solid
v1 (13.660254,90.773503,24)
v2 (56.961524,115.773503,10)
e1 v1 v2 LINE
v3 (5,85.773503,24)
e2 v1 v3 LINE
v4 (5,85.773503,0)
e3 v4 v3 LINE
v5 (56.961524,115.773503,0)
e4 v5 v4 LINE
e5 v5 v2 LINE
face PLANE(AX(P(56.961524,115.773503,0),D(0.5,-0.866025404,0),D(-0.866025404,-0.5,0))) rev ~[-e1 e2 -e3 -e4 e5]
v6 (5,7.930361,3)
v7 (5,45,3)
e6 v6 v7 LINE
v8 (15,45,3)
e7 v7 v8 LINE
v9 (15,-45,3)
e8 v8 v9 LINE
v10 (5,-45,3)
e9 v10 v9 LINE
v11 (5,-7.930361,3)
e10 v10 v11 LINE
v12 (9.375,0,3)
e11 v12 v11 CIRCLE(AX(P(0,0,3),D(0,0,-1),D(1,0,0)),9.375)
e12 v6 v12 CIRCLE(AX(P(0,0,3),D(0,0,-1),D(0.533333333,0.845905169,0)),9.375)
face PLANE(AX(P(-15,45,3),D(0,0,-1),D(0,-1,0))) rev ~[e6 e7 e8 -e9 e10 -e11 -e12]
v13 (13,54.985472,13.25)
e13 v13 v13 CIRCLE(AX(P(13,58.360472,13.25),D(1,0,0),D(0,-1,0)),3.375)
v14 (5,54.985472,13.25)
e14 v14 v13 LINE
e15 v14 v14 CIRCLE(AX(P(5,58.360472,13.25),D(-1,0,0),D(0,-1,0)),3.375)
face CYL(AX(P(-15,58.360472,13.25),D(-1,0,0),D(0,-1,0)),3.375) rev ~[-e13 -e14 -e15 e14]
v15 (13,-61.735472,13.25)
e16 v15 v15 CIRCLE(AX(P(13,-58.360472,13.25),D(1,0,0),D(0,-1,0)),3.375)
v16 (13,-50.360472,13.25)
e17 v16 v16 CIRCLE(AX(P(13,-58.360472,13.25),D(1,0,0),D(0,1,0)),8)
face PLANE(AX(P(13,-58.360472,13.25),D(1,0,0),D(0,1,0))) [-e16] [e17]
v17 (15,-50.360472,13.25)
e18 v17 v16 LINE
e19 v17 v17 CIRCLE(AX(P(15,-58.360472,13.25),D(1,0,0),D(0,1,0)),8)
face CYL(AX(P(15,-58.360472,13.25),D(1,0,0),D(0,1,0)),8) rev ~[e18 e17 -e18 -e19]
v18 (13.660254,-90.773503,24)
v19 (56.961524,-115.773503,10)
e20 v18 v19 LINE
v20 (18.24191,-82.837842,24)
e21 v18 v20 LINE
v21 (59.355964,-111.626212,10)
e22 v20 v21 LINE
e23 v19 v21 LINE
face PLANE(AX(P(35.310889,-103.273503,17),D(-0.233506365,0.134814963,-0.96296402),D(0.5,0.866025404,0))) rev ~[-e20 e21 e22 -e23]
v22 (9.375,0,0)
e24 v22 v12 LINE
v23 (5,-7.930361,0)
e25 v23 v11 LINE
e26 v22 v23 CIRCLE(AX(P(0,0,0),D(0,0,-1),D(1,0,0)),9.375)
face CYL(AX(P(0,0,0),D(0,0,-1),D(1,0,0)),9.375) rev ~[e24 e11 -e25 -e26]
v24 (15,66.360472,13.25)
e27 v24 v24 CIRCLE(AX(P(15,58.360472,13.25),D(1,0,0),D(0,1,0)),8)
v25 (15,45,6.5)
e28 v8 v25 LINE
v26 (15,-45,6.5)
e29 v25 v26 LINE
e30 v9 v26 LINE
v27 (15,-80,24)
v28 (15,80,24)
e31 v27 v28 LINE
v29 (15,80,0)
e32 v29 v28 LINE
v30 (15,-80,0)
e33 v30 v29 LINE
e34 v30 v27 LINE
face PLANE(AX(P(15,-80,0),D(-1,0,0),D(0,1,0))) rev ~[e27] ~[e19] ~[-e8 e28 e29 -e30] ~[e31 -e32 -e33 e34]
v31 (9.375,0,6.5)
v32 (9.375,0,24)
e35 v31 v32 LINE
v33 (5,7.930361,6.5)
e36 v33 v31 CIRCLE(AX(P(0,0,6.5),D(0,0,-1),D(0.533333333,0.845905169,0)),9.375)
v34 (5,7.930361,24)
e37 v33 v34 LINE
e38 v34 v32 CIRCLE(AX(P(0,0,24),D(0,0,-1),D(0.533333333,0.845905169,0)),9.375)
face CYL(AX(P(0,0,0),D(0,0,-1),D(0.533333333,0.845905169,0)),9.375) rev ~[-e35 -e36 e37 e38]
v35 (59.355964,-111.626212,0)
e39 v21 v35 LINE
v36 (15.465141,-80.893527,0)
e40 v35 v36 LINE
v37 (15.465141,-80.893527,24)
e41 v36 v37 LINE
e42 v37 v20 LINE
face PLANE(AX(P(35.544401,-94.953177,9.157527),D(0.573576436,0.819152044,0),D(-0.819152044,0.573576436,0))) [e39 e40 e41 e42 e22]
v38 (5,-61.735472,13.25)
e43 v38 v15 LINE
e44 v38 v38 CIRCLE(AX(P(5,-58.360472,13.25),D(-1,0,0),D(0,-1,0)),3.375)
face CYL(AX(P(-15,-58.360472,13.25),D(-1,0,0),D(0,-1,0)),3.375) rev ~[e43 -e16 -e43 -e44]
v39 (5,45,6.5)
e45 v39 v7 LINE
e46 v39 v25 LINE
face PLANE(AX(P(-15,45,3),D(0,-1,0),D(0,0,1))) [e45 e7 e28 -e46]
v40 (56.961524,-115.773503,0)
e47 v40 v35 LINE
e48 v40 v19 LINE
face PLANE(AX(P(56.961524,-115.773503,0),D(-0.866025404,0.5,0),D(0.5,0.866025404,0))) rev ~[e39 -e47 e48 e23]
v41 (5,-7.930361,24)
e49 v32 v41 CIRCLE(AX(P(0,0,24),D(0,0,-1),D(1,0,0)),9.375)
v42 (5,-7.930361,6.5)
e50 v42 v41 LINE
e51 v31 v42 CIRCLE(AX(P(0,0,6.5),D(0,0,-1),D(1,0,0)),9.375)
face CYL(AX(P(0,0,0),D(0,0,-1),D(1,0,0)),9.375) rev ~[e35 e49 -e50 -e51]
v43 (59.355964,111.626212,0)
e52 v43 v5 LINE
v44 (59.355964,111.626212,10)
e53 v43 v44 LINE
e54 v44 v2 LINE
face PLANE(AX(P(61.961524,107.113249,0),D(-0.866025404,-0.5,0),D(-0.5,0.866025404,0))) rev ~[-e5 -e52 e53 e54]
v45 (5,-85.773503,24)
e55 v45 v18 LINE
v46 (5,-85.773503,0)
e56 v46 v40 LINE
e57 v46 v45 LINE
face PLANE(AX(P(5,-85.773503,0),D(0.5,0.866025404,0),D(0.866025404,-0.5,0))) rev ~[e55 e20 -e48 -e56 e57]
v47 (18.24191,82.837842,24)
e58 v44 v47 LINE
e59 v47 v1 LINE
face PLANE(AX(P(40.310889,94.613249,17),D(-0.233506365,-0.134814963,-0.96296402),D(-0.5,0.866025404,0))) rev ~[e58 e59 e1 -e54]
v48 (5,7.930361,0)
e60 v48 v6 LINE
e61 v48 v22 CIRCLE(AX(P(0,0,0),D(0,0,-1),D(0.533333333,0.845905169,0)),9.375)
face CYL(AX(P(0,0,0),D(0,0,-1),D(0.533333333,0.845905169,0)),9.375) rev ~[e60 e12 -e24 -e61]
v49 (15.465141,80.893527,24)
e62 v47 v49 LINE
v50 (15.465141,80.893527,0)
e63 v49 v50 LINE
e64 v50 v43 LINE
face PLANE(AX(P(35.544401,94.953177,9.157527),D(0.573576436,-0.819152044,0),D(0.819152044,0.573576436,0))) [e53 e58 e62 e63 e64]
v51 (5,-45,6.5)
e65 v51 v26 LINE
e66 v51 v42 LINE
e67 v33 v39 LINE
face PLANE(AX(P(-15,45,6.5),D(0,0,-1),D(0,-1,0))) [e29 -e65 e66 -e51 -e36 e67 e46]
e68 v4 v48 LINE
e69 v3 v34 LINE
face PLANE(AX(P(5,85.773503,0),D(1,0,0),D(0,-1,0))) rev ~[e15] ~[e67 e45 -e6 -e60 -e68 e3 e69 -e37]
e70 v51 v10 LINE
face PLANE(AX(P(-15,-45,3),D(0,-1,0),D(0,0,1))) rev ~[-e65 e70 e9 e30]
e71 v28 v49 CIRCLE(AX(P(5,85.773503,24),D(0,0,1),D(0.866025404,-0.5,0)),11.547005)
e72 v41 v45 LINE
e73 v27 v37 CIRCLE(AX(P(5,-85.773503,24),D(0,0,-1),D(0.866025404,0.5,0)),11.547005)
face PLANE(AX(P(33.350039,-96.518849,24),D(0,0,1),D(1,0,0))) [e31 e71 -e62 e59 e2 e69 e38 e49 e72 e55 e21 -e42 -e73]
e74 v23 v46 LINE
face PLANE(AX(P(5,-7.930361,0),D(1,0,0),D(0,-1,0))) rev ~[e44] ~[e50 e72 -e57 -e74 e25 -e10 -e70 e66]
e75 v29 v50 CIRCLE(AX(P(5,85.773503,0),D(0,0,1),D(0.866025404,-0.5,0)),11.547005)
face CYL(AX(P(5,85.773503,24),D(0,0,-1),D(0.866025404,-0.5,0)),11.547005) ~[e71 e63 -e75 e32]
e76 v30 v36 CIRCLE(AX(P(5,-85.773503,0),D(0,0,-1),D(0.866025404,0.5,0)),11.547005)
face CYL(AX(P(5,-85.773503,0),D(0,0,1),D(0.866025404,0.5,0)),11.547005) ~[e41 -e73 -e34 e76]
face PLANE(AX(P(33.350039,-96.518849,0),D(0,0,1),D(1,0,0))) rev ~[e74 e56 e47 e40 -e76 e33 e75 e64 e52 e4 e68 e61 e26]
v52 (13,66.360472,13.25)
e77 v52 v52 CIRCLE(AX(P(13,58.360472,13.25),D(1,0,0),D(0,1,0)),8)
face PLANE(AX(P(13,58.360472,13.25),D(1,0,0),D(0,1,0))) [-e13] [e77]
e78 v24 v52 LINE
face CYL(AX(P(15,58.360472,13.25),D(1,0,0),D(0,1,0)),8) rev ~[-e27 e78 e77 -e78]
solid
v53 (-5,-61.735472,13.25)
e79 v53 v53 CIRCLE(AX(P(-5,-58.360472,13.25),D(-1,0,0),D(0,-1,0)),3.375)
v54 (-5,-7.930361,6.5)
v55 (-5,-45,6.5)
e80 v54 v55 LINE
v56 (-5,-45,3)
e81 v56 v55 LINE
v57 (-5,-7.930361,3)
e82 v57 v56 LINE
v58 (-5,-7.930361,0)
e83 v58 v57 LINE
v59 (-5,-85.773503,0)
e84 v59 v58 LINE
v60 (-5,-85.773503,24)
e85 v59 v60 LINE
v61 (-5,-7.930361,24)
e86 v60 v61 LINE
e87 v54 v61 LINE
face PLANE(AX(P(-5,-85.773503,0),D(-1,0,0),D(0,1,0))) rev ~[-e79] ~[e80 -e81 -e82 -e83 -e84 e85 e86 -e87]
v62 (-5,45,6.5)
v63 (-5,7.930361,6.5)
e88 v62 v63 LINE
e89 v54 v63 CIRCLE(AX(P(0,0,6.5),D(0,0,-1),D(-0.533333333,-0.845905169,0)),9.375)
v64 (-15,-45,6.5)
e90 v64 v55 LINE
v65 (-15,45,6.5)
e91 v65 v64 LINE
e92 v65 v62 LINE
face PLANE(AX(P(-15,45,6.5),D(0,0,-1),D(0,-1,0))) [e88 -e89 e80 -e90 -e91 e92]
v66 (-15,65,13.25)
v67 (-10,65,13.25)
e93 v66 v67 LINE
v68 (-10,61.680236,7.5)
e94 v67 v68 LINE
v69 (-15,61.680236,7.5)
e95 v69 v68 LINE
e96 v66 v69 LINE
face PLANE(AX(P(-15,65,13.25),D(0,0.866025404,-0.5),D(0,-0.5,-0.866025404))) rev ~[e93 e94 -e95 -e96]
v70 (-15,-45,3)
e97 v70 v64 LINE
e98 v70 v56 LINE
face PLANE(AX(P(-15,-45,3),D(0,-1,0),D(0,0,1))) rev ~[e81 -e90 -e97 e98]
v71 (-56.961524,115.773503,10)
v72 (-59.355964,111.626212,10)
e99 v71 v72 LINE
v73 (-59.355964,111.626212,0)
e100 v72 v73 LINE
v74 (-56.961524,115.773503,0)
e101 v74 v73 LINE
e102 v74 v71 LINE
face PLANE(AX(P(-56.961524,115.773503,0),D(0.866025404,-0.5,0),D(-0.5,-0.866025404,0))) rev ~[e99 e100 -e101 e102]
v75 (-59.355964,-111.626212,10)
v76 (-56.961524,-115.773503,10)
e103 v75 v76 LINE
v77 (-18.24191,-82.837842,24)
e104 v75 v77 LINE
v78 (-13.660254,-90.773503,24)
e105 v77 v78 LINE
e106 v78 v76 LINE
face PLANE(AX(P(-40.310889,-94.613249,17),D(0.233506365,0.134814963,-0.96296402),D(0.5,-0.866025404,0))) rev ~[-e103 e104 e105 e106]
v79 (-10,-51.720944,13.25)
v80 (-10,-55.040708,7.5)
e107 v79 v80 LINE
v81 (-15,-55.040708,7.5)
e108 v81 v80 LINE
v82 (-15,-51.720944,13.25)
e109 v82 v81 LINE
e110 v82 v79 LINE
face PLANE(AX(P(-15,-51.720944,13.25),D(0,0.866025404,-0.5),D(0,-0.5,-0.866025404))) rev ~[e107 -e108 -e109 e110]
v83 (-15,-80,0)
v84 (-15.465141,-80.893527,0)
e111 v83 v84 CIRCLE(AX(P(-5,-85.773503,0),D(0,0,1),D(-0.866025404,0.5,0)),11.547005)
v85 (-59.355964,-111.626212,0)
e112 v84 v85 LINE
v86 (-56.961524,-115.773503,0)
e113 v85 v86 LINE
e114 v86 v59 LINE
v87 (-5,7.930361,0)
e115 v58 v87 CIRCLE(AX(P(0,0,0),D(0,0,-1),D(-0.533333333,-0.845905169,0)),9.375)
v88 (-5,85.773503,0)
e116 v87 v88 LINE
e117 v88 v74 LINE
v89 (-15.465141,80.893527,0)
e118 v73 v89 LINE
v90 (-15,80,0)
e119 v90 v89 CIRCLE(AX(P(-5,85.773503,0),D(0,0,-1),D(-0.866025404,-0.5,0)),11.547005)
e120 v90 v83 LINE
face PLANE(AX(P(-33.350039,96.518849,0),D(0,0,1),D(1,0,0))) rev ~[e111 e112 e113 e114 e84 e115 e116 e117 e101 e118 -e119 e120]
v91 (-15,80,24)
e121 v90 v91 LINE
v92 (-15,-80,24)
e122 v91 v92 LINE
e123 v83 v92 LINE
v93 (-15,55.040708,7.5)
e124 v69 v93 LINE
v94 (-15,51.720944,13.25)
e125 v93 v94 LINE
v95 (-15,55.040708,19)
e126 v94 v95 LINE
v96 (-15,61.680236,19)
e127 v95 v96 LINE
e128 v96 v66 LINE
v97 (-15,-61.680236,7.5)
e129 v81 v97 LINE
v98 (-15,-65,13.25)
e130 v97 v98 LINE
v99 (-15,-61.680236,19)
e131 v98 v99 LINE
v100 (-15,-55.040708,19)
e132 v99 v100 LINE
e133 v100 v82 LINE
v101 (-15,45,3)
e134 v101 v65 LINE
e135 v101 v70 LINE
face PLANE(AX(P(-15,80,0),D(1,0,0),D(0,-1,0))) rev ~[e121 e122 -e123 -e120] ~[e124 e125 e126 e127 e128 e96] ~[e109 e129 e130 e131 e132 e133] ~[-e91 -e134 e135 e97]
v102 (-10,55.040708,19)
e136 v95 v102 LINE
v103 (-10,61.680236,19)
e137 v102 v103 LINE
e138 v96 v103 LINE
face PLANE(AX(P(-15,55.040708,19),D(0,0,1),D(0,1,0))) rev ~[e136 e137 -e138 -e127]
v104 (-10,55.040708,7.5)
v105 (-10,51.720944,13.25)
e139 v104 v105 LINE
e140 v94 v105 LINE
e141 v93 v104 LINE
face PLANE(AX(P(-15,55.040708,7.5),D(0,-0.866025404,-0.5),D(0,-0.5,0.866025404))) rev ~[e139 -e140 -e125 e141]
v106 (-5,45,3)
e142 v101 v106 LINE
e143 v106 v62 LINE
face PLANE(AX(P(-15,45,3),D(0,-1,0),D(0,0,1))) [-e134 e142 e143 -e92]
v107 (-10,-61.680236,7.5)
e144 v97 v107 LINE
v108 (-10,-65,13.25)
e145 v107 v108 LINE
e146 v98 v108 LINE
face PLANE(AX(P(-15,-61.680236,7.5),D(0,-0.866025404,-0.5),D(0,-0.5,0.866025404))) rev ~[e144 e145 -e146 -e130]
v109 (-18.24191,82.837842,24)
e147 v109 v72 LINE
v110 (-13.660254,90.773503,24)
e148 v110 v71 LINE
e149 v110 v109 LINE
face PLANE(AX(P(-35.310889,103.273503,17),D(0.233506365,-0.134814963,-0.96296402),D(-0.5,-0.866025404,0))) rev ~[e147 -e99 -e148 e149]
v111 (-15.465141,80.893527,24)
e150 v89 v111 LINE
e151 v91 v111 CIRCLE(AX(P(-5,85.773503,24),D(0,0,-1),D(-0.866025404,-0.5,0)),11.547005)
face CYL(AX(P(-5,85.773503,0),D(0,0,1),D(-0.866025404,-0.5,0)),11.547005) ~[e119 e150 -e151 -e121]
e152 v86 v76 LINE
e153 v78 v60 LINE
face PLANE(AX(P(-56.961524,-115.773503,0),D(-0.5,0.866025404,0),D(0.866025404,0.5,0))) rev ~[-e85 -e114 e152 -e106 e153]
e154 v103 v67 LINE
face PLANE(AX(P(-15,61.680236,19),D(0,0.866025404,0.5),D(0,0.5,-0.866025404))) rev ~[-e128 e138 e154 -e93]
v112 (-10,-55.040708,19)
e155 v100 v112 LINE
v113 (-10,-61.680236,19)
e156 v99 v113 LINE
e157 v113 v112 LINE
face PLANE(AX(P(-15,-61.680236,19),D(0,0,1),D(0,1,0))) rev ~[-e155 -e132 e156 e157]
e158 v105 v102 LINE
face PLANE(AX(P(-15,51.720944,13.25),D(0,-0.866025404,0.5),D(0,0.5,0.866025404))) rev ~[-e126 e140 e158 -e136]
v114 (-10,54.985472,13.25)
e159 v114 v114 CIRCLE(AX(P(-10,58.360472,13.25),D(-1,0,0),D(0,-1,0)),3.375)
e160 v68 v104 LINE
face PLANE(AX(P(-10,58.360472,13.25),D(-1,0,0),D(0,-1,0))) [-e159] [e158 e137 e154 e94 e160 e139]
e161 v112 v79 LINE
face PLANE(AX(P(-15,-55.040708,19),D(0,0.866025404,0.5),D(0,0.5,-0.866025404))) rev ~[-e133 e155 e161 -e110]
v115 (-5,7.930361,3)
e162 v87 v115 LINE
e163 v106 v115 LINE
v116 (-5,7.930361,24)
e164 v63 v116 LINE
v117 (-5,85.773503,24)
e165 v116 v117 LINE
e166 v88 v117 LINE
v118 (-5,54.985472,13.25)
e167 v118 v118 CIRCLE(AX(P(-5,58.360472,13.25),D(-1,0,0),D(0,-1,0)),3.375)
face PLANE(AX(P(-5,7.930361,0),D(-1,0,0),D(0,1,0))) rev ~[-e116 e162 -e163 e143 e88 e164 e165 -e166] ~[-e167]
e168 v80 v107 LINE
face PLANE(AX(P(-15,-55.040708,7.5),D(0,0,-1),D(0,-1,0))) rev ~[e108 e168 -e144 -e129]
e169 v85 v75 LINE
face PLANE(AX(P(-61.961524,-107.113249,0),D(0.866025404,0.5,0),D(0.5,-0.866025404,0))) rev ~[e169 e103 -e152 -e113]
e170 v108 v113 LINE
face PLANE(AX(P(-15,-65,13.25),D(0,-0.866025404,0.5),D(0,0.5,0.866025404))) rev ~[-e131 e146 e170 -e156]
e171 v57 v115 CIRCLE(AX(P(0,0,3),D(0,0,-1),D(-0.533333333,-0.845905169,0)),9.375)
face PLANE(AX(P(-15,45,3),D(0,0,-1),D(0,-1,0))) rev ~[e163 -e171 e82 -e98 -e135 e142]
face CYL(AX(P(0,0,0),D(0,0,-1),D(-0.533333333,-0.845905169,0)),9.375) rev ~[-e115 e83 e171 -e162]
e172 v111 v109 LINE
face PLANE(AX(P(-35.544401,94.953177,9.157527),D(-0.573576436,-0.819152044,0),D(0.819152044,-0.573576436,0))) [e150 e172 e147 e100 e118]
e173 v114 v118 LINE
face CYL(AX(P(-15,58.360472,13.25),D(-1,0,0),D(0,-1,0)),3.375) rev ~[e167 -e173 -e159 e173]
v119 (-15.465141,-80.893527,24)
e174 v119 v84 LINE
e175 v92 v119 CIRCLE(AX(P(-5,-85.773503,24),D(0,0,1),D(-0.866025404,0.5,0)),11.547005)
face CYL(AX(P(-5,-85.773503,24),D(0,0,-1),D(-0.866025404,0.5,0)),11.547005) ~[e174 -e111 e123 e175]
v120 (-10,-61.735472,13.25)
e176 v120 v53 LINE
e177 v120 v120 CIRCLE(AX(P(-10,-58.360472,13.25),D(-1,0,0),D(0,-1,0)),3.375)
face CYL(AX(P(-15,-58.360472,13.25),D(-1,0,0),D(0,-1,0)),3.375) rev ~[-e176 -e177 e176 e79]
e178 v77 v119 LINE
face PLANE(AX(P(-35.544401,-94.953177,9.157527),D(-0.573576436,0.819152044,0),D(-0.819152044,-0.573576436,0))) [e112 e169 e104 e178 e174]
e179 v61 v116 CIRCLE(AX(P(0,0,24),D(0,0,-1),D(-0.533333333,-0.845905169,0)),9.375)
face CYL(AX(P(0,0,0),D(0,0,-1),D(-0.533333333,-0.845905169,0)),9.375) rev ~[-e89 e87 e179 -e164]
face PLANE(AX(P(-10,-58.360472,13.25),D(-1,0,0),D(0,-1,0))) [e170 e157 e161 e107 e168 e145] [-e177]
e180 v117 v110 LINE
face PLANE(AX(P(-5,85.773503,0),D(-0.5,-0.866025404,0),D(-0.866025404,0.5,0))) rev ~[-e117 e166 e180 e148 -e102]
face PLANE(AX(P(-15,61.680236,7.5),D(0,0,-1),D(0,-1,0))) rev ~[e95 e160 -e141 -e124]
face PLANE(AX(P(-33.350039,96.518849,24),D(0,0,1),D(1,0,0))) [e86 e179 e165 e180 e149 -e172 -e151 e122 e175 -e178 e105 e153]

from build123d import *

# Parameters (mm, degrees)
F4_DEPTH    = 24
F5_W        = 90
F5_H        = 3.5
F5_R        = 3.375
F6_DEPTH    = 76.9625242271
F7_DEPTH    = 5
F8_R        = 8
F8_R_2      = 3.375
F9_DEPTH    = 2
F10_SIZE2   = 14
F10_SIZE    = 50
F10_2_SIZE2 = 14
F10_2_SIZE  = 50
F11_ANGLE   = 5
F12_ANGLE   = 5
F13_ANGLE   = 5
F14_ANGLE   = 5


# Not quite as in the source:
# - a feature of the source that left no trace in its solid (it failed there, or was rolled back) is left out


with BuildPart() as f4:
    # F3 (on Top) → F4 (new body)
    with BuildSketch(Plane.XY):
        Polygon((-61.9615242271, 107.1132486541), (-15, 80), (-5, 80), (-5, 85.7735026919), (-56.9615242271, 115.7735026919), align=None)
        with BuildLine():
            Line((-15, 80), (-15, -80))
            Line((-15, -80), (-5, -80))
            Line((-5, -80), (-5, -7.9303609628))
            ThreePointArc((-5, -7.9303609628), (-9.375, 0), (-5, 7.9303609628))
            Line((-5, 7.9303609628), (-5, 80))
            Line((-5, 80), (-15, 80))
        make_face()
        Polygon((-5, -80), (-15, -80), (-61.9615242271, -107.1132486541), (-56.9615242271, -115.7735026919), (-5, -85.7735026919), align=None)
    extrude(amount=F4_DEPTH)


with BuildPart() as f4b:
    # F3 (on Top) → F4, piece 2 (new body)
    with BuildSketch(Plane.XY):
        Polygon((15, -80), (5, -80), (5, -85.7735026919), (56.9615242271, -115.7735026919), (61.9615242271, -107.1132486541), align=None)
        with BuildLine():
            ThreePointArc((9.375, 0), (8.2087034604, -4.5285552332), (5, -7.9303609628))
            Line((5, -7.9303609628), (5, -80))
            Line((5, -80), (15, -80))
            Line((15, -80), (15, 80))
            Line((15, 80), (5, 80))
            Line((5, 80), (5, 7.9303609628))
            ThreePointArc((5, 7.9303609628), (8.2087034604, 4.5285552332), (9.375, 0))
        make_face()
        Polygon((5, 85.7735026919), (5, 80), (15, 80), (61.9615242271, 107.1132486541), (56.9615242271, 115.7735026919), align=None)
    extrude(amount=F4_DEPTH)


with BuildPart() as f6_tool:
    # F5 (on face) → F6 (new body, through all)
    with BuildSketch(Plane(origin=(-15, 0, 0), x_dir=(0, -1, 0), z_dir=(-1, 0, 0))):
        with Locations((0, 4.75)):
            Rectangle(F5_W, F5_H)
        with Locations((-58.3604719043, 13.25)):
            Circle(F5_R)
        with Locations((58.3604719043, 13.25)):
            Circle(F5_R)
    extrude(amount=-F6_DEPTH)


with BuildPart() as f4_1:
    add(f4.part)

    # F6: cut by f6_tool
    add(f6_tool.part, mode=Mode.SUBTRACT)

    # F5 (on face) → F7 (cut)
    with BuildSketch(Plane(origin=(-15, 0, 0), x_dir=(0, -1, 0), z_dir=(-1, 0, 0))):
        Polygon((65, 13.25), (61.6802359522, 19), (55.0407078565, 19), (51.7209438086, 13.25), (55.0407078565, 7.5), (61.6802359522, 7.5), align=None)
        with Locations((58.3604719043, 13.25)):
            Circle(F5_R, mode=Mode.SUBTRACT)
        Polygon((-51.7209438086, 13.25), (-55.0407078565, 19), (-61.6802359522, 19), (-65, 13.25), (-61.6802359522, 7.5), (-55.0407078565, 7.5), align=None)
        with Locations((-58.3604719043, 13.25)):
            Circle(F5_R, mode=Mode.SUBTRACT)
    extrude(amount=-F7_DEPTH, mode=Mode.SUBTRACT)

    # F10
    f10_edges = [f4_1.edges().sort_by_distance(p)[0] for p in [
        (-59.461524, -111.443376, 24),
        (-59.461524, 111.443376, 24),
    ]]
    f10_side = f4_1.faces().sort_by_distance((-37.28851, 95.621666, 24))[0]
    chamfer(f10_edges, length=F10_SIZE, length2=F10_SIZE2, reference=f10_side)

    # F4_face2 (on face) → F11 (revolve, cut)
    with BuildSketch(Plane(origin=(-35.1526852914, 91.6351582779, 9.3023231821), x_dir=(0.8660254038, -0.5, 0), z_dir=(-0.5, -0.8660254038, 0))):
        Polygon((-30.9561807523, 0.6976768179), (-30.9561807523, -9.3023231821), (23.2703165558, -9.3023231821), (23.2703165558, 14.6976768179), (19.0438192477, 14.6976768179), align=None)
    revolve(axis=Axis((-5, 85.7735026919, 12), (0, 0, -1)), revolution_arc=F11_ANGLE, mode=Mode.SUBTRACT)

    # F4_face5 (on face) → F14 (revolve, cut)
    with BuildSketch(Plane(origin=(-35.1526852914, -91.6351582779, 9.3023231821), x_dir=(-0.8660254038, -0.5, 0), z_dir=(-0.5, 0.8660254038, 0))):
        Polygon((30.9561807523, -9.3023231821), (30.9561807523, 0.6976768179), (-19.0438192477, 14.6976768179), (-23.2703165558, 14.6976768179), (-23.2703165558, -9.3023231821), align=None)
    revolve(axis=Axis((-5, -85.7735026919, 12), (0, 0, 1)), revolution_arc=F14_ANGLE, mode=Mode.SUBTRACT)


with BuildPart() as f4b_1:
    add(f4b.part)

    # F6: cut by f6_tool
    add(f6_tool.part, mode=Mode.SUBTRACT)

    # F8 (on face) → F9 (cut)
    with BuildSketch(Plane.YZ.offset(15)):
        with Locations((-58.3604719043, 13.25)):
            Circle(F8_R)
        with Locations((-58.3604719043, 13.25)):
            Circle(F8_R_2, mode=Mode.SUBTRACT)
        with Locations((58.3604719043, 13.25)):
            Circle(F8_R)
        with Locations((58.3604719043, 13.25)):
            Circle(F8_R_2, mode=Mode.SUBTRACT)
    extrude(amount=-F9_DEPTH, mode=Mode.SUBTRACT)

    # F10#2
    f10_2_edges = [f4b_1.edges().sort_by_distance(p)[0] for p in [
        (59.461524, 111.443376, 24),
        (59.461524, -111.443376, 24),
    ]]
    f10_2_side = f4b_1.faces().sort_by_distance((37.28851, -95.621666, 24))[0]
    chamfer(f10_2_edges, length=F10_2_SIZE, length2=F10_2_SIZE2, reference=f10_2_side)

    # F4_face3 (on face) → F12 (revolve, cut)
    with BuildSketch(Plane(origin=(35.1526852914, 91.6351582779, 9.3023231821), x_dir=(0.8660254038, 0.5, 0), z_dir=(0.5, -0.8660254038, 0))):
        Polygon((30.9561807523, -9.3023231821), (30.9561807523, 0.6976768179), (-19.0438192477, 14.6976768179), (-23.2703165558, 14.6976768179), (-23.2703165558, -9.3023231821), align=None)
    revolve(axis=Axis((5, 85.7735026919, 12), (0, 0, 1)), revolution_arc=F12_ANGLE, mode=Mode.SUBTRACT)

    # F4_face4 (on face) → F13 (revolve, cut)
    with BuildSketch(Plane(origin=(35.1526852914, -91.6351582779, 9.3023231821), x_dir=(-0.8660254038, 0.5, 0), z_dir=(0.5, 0.8660254038, 0))):
        Polygon((-30.9561807523, 0.6976768179), (-30.9561807523, -9.3023231821), (23.2703165558, -9.3023231821), (23.2703165558, 14.6976768179), (19.0438192477, 14.6976768179), align=None)
    revolve(axis=Axis((5, -85.7735026919, 12), (0, 0, -1)), revolution_arc=F13_ANGLE, mode=Mode.SUBTRACT)


solid = Compound([f4_1.part, f4b_1.part])
